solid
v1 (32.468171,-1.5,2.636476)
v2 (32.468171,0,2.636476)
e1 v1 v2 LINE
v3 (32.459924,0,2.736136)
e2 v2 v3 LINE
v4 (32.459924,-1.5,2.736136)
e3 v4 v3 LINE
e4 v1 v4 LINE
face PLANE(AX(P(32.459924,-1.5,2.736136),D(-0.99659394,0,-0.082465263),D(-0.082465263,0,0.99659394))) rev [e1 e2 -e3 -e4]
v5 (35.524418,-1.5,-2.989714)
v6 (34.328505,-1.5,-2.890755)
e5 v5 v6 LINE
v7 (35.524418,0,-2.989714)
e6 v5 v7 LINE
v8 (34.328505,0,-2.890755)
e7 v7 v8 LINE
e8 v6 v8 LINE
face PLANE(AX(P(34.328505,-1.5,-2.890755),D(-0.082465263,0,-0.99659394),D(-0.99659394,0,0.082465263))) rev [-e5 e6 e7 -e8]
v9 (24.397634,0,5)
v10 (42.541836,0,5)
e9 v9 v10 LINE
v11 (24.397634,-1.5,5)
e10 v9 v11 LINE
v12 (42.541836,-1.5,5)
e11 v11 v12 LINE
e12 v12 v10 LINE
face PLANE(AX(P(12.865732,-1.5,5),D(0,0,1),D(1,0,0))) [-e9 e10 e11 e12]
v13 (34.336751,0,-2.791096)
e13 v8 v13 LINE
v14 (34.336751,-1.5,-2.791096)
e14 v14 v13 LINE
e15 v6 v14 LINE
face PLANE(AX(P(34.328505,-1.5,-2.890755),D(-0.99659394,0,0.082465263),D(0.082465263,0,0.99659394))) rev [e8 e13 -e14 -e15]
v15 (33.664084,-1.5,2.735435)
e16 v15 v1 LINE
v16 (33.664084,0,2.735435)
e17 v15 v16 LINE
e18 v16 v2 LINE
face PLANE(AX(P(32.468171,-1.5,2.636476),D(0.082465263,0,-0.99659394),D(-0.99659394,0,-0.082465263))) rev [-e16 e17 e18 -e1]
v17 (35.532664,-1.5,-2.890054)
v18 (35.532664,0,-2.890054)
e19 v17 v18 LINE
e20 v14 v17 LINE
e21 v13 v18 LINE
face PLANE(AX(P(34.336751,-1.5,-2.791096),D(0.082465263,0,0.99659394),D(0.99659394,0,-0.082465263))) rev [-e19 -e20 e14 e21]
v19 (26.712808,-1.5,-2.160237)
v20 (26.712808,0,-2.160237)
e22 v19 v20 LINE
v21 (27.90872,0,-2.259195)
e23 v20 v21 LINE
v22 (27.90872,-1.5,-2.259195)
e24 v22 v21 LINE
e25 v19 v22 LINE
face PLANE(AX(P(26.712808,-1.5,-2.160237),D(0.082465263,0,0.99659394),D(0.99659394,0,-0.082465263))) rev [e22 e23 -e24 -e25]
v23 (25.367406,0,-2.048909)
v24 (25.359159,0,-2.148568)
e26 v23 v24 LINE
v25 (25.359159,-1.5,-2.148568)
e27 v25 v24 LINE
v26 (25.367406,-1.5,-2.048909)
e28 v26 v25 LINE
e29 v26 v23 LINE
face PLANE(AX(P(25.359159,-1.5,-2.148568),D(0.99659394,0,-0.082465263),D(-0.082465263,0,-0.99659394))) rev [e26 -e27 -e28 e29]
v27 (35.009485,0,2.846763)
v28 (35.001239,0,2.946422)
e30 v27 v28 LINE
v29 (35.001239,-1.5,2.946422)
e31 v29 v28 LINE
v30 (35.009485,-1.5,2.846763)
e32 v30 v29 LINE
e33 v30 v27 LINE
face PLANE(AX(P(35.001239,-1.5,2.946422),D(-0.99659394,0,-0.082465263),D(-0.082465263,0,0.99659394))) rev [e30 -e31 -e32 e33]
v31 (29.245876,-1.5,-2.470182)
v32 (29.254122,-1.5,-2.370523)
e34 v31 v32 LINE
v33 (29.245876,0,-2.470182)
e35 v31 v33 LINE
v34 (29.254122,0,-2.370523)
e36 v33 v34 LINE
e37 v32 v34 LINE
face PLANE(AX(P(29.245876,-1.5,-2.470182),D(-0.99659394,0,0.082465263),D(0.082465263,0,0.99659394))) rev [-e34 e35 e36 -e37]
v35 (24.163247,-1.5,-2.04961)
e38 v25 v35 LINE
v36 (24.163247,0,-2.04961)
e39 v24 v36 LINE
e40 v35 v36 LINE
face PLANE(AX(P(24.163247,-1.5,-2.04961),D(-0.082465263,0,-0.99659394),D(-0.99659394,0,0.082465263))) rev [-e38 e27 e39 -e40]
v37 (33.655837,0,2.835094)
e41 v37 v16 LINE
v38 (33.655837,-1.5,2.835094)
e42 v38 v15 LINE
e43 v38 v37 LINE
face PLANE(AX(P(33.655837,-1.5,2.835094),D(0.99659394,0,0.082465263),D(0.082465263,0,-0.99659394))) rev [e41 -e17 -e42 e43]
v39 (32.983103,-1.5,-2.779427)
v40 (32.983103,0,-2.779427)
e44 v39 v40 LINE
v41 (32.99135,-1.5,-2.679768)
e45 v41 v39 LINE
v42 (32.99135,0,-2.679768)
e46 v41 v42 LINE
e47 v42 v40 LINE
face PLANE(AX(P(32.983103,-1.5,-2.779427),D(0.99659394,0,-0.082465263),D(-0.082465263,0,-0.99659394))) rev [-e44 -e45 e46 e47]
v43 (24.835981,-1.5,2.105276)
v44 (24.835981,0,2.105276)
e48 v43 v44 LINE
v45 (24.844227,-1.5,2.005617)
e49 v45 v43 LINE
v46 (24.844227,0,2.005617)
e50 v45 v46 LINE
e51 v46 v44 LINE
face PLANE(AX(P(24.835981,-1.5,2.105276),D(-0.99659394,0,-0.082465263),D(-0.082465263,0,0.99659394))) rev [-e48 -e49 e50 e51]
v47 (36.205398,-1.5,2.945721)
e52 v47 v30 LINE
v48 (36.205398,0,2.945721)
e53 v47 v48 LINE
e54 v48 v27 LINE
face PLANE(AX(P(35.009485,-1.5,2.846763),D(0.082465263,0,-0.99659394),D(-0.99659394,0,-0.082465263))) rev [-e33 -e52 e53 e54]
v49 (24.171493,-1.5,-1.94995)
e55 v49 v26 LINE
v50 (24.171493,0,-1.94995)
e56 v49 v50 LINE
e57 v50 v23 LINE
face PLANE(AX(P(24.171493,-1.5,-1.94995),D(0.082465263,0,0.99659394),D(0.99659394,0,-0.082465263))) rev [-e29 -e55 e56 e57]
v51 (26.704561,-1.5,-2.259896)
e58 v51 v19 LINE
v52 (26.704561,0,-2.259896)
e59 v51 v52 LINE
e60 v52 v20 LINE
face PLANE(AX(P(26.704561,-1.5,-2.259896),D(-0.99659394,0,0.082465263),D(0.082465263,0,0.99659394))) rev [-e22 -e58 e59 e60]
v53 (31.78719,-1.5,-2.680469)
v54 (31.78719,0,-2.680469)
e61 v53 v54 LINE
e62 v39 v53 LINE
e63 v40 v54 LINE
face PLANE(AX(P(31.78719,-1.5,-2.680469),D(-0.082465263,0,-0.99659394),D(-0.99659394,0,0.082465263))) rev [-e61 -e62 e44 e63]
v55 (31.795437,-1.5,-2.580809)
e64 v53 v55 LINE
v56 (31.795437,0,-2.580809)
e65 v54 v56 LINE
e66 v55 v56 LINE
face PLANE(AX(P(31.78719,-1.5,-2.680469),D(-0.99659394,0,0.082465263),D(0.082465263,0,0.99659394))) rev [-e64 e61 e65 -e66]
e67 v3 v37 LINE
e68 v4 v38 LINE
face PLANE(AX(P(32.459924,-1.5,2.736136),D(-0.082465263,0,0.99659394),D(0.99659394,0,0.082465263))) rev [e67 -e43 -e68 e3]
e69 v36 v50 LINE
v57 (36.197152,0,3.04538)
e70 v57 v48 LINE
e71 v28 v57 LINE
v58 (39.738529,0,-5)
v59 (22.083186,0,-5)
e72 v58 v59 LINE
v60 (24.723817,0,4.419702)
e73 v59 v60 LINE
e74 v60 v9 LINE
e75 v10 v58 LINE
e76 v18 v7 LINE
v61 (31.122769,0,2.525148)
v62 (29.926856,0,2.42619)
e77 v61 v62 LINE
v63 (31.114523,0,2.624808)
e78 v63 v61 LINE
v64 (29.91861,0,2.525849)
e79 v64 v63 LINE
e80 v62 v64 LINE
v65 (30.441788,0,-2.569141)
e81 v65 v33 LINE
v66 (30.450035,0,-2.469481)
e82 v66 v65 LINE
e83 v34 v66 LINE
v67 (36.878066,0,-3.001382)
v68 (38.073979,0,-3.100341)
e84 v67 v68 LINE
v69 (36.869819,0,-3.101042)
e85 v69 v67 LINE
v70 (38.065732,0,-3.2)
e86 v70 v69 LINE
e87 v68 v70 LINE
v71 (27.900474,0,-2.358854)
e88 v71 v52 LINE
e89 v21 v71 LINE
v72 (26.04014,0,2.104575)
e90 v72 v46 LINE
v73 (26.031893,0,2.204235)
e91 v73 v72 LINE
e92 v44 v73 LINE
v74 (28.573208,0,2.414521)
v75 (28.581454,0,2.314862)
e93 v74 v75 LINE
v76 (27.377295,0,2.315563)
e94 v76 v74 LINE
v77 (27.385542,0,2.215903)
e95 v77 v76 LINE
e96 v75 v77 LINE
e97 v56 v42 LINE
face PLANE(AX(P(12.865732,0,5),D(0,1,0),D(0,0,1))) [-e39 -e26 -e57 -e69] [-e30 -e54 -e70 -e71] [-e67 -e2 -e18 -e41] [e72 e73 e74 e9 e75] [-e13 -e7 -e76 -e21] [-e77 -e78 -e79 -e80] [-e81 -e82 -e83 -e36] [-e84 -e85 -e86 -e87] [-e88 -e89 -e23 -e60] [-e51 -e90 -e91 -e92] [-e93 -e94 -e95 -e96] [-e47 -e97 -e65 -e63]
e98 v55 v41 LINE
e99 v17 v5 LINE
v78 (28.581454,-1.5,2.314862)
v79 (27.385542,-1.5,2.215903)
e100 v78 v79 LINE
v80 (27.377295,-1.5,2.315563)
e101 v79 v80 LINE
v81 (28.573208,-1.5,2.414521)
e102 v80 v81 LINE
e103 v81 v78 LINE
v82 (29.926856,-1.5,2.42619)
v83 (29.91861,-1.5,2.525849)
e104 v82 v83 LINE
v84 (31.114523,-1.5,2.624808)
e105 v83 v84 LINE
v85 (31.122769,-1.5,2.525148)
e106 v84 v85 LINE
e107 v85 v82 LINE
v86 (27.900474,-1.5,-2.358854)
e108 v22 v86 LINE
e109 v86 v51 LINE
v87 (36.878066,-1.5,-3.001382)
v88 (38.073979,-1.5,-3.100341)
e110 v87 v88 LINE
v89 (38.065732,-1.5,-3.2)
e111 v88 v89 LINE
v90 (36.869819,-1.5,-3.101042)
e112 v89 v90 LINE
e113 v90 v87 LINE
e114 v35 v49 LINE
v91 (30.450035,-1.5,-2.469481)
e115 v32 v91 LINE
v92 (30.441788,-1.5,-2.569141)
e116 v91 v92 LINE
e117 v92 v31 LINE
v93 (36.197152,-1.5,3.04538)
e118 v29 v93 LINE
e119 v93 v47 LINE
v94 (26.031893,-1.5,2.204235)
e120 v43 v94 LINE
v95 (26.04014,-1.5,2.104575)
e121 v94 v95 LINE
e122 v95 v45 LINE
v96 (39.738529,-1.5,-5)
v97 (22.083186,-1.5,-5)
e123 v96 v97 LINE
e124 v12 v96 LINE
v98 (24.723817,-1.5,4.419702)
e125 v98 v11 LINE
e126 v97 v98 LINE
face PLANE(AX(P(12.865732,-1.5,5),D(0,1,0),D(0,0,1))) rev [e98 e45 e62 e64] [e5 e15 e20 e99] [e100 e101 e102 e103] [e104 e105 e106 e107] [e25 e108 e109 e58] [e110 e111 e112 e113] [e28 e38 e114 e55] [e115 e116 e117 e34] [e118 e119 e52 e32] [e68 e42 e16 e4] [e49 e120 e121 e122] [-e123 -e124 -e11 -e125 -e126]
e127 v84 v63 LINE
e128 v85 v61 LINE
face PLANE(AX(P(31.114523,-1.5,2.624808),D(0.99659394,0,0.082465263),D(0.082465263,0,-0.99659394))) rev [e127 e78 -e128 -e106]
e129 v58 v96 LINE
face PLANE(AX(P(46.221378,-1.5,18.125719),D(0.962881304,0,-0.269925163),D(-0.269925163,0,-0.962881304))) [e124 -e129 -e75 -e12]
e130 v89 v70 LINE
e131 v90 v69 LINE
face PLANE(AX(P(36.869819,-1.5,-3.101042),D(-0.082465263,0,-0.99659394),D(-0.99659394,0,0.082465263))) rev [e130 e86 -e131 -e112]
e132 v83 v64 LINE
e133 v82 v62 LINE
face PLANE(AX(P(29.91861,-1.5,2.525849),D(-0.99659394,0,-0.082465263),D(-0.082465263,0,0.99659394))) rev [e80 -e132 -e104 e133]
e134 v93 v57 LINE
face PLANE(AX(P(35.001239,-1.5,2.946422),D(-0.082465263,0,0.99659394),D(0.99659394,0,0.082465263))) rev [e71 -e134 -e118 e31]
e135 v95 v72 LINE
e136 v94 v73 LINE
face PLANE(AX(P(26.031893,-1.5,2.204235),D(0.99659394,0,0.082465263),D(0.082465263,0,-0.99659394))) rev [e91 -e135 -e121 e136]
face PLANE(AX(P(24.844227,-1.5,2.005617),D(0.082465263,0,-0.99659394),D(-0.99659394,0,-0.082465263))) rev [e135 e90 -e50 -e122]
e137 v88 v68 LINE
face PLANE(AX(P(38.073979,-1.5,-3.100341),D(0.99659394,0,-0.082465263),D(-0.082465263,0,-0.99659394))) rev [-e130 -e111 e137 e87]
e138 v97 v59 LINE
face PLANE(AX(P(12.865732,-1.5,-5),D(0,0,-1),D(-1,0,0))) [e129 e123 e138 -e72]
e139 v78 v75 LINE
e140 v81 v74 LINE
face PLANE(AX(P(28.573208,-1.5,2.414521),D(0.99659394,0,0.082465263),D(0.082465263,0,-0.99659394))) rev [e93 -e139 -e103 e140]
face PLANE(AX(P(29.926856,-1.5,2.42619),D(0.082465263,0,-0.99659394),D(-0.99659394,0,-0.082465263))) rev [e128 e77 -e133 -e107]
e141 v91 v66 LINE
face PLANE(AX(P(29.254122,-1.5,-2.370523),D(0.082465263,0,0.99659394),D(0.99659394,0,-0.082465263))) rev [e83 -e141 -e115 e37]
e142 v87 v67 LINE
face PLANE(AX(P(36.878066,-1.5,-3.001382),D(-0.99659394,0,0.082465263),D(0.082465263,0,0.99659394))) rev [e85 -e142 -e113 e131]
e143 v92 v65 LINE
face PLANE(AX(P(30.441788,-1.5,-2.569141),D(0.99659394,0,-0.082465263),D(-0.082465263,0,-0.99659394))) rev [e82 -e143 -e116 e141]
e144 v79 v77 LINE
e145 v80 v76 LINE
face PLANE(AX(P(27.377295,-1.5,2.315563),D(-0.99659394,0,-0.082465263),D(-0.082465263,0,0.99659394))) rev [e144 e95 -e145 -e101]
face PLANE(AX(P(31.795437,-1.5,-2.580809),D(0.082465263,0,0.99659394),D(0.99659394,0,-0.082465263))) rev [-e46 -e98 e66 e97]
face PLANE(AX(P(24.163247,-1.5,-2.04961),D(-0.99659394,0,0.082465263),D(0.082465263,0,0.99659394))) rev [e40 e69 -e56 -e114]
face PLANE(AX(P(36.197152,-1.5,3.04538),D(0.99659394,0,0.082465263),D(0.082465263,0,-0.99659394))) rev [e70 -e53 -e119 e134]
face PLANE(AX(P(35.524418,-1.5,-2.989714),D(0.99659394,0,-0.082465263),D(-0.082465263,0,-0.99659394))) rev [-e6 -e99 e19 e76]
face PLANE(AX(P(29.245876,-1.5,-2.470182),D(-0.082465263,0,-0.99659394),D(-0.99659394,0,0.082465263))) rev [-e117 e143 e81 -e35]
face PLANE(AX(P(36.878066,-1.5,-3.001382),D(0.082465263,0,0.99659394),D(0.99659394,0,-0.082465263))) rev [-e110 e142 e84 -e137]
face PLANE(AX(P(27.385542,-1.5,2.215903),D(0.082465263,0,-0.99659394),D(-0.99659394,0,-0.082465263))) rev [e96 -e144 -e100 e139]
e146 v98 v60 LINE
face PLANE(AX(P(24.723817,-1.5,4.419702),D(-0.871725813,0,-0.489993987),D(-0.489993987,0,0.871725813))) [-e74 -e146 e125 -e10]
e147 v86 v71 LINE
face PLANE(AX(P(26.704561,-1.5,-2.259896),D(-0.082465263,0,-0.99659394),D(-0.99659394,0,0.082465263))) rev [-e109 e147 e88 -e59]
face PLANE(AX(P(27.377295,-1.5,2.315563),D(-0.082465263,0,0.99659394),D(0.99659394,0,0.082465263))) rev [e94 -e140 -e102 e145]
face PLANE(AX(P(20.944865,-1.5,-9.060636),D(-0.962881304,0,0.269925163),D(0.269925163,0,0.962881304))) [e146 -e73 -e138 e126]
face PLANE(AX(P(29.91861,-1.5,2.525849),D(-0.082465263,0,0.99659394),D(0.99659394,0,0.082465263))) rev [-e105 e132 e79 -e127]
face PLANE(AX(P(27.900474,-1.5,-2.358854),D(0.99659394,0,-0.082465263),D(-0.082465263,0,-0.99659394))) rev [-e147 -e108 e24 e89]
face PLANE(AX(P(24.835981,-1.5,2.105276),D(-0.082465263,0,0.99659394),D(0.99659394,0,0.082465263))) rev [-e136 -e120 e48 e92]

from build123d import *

# Parameters (mm, degrees)
ESQUISSE1_W                 = 33
ESQUISSE1_H                 = 10
ESQUISSE1_R                 = 1
EXTRUSION1_DEPTH            = 1.5
ENL_V_START                 = -1.5
ENL_V_MAT_EXTRU_1_OUTLINE_R = 1
ENL_V_MAT_EXTRU_1_DEPTH     = 1.5


# Read off the part's stored shape, not the designer's step: Enlèv. mat.-Extru.1
with BuildPart() as part:
    # Esquisse1 → Extrusion1 (new body)
    with BuildSketch(Plane(origin=(0, 0, 0), x_dir=(1, 0, 0), z_dir=(0, 1, 0))):
        with Locations((29.365732097, 0)):
            Rectangle(ESQUISSE1_W, ESQUISSE1_H)
        with Locations(Location((42.865732097, 0, 0), (0, 0, 270))):
            Circle(ESQUISSE1_R, mode=Mode.SUBTRACT)
        with Locations(Location((15.865732097, 0, 0), (0, 0, 270))):
            Circle(ESQUISSE1_R, mode=Mode.SUBTRACT)
        Polygon((36.878065896, 3.001382291), (36.86981937, 3.101041684), (38.065732097, 3.2), (38.073978624, 3.100340606), align=None, mode=Mode.SUBTRACT)
        Polygon((34.328504824, 2.890755264), (34.33675135, 2.79109587), (35.532664078, 2.890054186), (35.524417551, 2.989713579), align=None, mode=Mode.SUBTRACT)
        Polygon((31.787190278, 2.680468843), (31.795436804, 2.580809449), (32.991349532, 2.679767765), (32.983103005, 2.779427159), align=None, mode=Mode.SUBTRACT)
        Polygon((29.245875732, 2.470182423), (29.254122258, 2.370523029), (30.450034986, 2.469481345), (30.44178846, 2.569140738), align=None, mode=Mode.SUBTRACT)
        Polygon((26.704561186, 2.259896002), (26.712807712, 2.160236608), (27.90872044, 2.259194924), (27.900473914, 2.358854318), align=None, mode=Mode.SUBTRACT)
        Polygon((24.16324664, 2.049609582), (24.171493166, 1.949950188), (25.367405894, 2.048908503), (25.359159368, 2.148567897), align=None, mode=Mode.SUBTRACT)
        Polygon((21.621932094, 1.839323161), (21.630178621, 1.739663767), (22.826091348, 1.838622083), (22.817844822, 1.938281477), align=None, mode=Mode.SUBTRACT)
        Polygon((19.080617548, 1.629036741), (19.088864075, 1.529377347), (20.284776802, 1.628335662), (20.276530276, 1.727995056), align=None, mode=Mode.SUBTRACT)
        Polygon((22.294666135, -1.894989955), (22.302912661, -1.795330561), (23.498825389, -1.894288877), (23.490578862, -1.993948271), align=None, mode=Mode.SUBTRACT)
        Polygon((27.377295227, -2.315562796), (27.385541753, -2.215903402), (28.581454481, -2.314861718), (28.573207954, -2.414521112), align=None, mode=Mode.SUBTRACT)
        Polygon((32.459924319, -2.736135637), (32.468170845, -2.636476244), (33.664083572, -2.735434559), (33.655837046, -2.835093953), align=None, mode=Mode.SUBTRACT)
        Polygon((35.001238865, -2.946422058), (35.009485391, -2.846762664), (36.205398118, -2.94572098), (36.197151592, -3.045380374), align=None, mode=Mode.SUBTRACT)
        Polygon((29.918609773, -2.525849217), (29.926856299, -2.426189823), (31.122769027, -2.525148139), (31.1145225, -2.624807532), align=None, mode=Mode.SUBTRACT)
        Polygon((24.835980681, -2.105276376), (24.844227207, -2.005616982), (26.040139935, -2.104575297), (26.031893408, -2.204234691), align=None, mode=Mode.SUBTRACT)
        Polygon((19.753351589, -1.684703535), (19.761598115, -1.585044141), (20.957510843, -1.684002456), (20.949264317, -1.78366185), align=None, mode=Mode.SUBTRACT)
    extrude(amount=-EXTRUSION1_DEPTH)

    # Enlèv. mat.-Extru.1 outline → Enlèv. mat.-Extru.1 (cut)
    # profile 1 of 2: a face of its own
    with BuildSketch(Plane(origin=(0, 0, 0), x_dir=(1, 0, 0), z_dir=(0, 1, 0)).offset(ENL_V_START)):
        Polygon((24.723817468, -4.419702073), (22.083186059, 5), (12.865732097, 5), (12.865732097, -5), (24.397634062, -5), align=None)
        Polygon((20.949264317, -1.78366185), (19.753351589, -1.684703535), (19.761598115, -1.585044141), (20.957510843, -1.684002456), align=None, mode=Mode.SUBTRACT)
        Polygon((23.490578862, -1.993948271), (22.294666135, -1.894989955), (22.302912661, -1.795330561), (23.498825389, -1.894288877), align=None, mode=Mode.SUBTRACT)
        with Locations((15.865732097, 0)):
            Circle(ENL_V_MAT_EXTRU_1_OUTLINE_R, mode=Mode.SUBTRACT)
        Polygon((19.080617548, 1.629036741), (20.276530276, 1.727995056), (20.284776802, 1.628335662), (19.088864075, 1.529377347), align=None, mode=Mode.SUBTRACT)
        Polygon((21.621932094, 1.839323161), (22.817844822, 1.938281477), (22.826091348, 1.838622083), (21.630178621, 1.739663767), align=None, mode=Mode.SUBTRACT)
    # profile 2 of 2: a face of its own
    with BuildSketch(Plane(origin=(0, 0, 0), x_dir=(1, 0, 0), z_dir=(0, 1, 0)).offset(ENL_V_START)):
        Polygon((45.865732097, 5), (39.738529372, 5), (42.541836089, -5), (45.865732097, -5), align=None)
        with Locations((42.865732097, 0)):
            Circle(ENL_V_MAT_EXTRU_1_OUTLINE_R, mode=Mode.SUBTRACT)
    extrude(amount=ENL_V_MAT_EXTRU_1_DEPTH, mode=Mode.SUBTRACT)


solid = part.part
